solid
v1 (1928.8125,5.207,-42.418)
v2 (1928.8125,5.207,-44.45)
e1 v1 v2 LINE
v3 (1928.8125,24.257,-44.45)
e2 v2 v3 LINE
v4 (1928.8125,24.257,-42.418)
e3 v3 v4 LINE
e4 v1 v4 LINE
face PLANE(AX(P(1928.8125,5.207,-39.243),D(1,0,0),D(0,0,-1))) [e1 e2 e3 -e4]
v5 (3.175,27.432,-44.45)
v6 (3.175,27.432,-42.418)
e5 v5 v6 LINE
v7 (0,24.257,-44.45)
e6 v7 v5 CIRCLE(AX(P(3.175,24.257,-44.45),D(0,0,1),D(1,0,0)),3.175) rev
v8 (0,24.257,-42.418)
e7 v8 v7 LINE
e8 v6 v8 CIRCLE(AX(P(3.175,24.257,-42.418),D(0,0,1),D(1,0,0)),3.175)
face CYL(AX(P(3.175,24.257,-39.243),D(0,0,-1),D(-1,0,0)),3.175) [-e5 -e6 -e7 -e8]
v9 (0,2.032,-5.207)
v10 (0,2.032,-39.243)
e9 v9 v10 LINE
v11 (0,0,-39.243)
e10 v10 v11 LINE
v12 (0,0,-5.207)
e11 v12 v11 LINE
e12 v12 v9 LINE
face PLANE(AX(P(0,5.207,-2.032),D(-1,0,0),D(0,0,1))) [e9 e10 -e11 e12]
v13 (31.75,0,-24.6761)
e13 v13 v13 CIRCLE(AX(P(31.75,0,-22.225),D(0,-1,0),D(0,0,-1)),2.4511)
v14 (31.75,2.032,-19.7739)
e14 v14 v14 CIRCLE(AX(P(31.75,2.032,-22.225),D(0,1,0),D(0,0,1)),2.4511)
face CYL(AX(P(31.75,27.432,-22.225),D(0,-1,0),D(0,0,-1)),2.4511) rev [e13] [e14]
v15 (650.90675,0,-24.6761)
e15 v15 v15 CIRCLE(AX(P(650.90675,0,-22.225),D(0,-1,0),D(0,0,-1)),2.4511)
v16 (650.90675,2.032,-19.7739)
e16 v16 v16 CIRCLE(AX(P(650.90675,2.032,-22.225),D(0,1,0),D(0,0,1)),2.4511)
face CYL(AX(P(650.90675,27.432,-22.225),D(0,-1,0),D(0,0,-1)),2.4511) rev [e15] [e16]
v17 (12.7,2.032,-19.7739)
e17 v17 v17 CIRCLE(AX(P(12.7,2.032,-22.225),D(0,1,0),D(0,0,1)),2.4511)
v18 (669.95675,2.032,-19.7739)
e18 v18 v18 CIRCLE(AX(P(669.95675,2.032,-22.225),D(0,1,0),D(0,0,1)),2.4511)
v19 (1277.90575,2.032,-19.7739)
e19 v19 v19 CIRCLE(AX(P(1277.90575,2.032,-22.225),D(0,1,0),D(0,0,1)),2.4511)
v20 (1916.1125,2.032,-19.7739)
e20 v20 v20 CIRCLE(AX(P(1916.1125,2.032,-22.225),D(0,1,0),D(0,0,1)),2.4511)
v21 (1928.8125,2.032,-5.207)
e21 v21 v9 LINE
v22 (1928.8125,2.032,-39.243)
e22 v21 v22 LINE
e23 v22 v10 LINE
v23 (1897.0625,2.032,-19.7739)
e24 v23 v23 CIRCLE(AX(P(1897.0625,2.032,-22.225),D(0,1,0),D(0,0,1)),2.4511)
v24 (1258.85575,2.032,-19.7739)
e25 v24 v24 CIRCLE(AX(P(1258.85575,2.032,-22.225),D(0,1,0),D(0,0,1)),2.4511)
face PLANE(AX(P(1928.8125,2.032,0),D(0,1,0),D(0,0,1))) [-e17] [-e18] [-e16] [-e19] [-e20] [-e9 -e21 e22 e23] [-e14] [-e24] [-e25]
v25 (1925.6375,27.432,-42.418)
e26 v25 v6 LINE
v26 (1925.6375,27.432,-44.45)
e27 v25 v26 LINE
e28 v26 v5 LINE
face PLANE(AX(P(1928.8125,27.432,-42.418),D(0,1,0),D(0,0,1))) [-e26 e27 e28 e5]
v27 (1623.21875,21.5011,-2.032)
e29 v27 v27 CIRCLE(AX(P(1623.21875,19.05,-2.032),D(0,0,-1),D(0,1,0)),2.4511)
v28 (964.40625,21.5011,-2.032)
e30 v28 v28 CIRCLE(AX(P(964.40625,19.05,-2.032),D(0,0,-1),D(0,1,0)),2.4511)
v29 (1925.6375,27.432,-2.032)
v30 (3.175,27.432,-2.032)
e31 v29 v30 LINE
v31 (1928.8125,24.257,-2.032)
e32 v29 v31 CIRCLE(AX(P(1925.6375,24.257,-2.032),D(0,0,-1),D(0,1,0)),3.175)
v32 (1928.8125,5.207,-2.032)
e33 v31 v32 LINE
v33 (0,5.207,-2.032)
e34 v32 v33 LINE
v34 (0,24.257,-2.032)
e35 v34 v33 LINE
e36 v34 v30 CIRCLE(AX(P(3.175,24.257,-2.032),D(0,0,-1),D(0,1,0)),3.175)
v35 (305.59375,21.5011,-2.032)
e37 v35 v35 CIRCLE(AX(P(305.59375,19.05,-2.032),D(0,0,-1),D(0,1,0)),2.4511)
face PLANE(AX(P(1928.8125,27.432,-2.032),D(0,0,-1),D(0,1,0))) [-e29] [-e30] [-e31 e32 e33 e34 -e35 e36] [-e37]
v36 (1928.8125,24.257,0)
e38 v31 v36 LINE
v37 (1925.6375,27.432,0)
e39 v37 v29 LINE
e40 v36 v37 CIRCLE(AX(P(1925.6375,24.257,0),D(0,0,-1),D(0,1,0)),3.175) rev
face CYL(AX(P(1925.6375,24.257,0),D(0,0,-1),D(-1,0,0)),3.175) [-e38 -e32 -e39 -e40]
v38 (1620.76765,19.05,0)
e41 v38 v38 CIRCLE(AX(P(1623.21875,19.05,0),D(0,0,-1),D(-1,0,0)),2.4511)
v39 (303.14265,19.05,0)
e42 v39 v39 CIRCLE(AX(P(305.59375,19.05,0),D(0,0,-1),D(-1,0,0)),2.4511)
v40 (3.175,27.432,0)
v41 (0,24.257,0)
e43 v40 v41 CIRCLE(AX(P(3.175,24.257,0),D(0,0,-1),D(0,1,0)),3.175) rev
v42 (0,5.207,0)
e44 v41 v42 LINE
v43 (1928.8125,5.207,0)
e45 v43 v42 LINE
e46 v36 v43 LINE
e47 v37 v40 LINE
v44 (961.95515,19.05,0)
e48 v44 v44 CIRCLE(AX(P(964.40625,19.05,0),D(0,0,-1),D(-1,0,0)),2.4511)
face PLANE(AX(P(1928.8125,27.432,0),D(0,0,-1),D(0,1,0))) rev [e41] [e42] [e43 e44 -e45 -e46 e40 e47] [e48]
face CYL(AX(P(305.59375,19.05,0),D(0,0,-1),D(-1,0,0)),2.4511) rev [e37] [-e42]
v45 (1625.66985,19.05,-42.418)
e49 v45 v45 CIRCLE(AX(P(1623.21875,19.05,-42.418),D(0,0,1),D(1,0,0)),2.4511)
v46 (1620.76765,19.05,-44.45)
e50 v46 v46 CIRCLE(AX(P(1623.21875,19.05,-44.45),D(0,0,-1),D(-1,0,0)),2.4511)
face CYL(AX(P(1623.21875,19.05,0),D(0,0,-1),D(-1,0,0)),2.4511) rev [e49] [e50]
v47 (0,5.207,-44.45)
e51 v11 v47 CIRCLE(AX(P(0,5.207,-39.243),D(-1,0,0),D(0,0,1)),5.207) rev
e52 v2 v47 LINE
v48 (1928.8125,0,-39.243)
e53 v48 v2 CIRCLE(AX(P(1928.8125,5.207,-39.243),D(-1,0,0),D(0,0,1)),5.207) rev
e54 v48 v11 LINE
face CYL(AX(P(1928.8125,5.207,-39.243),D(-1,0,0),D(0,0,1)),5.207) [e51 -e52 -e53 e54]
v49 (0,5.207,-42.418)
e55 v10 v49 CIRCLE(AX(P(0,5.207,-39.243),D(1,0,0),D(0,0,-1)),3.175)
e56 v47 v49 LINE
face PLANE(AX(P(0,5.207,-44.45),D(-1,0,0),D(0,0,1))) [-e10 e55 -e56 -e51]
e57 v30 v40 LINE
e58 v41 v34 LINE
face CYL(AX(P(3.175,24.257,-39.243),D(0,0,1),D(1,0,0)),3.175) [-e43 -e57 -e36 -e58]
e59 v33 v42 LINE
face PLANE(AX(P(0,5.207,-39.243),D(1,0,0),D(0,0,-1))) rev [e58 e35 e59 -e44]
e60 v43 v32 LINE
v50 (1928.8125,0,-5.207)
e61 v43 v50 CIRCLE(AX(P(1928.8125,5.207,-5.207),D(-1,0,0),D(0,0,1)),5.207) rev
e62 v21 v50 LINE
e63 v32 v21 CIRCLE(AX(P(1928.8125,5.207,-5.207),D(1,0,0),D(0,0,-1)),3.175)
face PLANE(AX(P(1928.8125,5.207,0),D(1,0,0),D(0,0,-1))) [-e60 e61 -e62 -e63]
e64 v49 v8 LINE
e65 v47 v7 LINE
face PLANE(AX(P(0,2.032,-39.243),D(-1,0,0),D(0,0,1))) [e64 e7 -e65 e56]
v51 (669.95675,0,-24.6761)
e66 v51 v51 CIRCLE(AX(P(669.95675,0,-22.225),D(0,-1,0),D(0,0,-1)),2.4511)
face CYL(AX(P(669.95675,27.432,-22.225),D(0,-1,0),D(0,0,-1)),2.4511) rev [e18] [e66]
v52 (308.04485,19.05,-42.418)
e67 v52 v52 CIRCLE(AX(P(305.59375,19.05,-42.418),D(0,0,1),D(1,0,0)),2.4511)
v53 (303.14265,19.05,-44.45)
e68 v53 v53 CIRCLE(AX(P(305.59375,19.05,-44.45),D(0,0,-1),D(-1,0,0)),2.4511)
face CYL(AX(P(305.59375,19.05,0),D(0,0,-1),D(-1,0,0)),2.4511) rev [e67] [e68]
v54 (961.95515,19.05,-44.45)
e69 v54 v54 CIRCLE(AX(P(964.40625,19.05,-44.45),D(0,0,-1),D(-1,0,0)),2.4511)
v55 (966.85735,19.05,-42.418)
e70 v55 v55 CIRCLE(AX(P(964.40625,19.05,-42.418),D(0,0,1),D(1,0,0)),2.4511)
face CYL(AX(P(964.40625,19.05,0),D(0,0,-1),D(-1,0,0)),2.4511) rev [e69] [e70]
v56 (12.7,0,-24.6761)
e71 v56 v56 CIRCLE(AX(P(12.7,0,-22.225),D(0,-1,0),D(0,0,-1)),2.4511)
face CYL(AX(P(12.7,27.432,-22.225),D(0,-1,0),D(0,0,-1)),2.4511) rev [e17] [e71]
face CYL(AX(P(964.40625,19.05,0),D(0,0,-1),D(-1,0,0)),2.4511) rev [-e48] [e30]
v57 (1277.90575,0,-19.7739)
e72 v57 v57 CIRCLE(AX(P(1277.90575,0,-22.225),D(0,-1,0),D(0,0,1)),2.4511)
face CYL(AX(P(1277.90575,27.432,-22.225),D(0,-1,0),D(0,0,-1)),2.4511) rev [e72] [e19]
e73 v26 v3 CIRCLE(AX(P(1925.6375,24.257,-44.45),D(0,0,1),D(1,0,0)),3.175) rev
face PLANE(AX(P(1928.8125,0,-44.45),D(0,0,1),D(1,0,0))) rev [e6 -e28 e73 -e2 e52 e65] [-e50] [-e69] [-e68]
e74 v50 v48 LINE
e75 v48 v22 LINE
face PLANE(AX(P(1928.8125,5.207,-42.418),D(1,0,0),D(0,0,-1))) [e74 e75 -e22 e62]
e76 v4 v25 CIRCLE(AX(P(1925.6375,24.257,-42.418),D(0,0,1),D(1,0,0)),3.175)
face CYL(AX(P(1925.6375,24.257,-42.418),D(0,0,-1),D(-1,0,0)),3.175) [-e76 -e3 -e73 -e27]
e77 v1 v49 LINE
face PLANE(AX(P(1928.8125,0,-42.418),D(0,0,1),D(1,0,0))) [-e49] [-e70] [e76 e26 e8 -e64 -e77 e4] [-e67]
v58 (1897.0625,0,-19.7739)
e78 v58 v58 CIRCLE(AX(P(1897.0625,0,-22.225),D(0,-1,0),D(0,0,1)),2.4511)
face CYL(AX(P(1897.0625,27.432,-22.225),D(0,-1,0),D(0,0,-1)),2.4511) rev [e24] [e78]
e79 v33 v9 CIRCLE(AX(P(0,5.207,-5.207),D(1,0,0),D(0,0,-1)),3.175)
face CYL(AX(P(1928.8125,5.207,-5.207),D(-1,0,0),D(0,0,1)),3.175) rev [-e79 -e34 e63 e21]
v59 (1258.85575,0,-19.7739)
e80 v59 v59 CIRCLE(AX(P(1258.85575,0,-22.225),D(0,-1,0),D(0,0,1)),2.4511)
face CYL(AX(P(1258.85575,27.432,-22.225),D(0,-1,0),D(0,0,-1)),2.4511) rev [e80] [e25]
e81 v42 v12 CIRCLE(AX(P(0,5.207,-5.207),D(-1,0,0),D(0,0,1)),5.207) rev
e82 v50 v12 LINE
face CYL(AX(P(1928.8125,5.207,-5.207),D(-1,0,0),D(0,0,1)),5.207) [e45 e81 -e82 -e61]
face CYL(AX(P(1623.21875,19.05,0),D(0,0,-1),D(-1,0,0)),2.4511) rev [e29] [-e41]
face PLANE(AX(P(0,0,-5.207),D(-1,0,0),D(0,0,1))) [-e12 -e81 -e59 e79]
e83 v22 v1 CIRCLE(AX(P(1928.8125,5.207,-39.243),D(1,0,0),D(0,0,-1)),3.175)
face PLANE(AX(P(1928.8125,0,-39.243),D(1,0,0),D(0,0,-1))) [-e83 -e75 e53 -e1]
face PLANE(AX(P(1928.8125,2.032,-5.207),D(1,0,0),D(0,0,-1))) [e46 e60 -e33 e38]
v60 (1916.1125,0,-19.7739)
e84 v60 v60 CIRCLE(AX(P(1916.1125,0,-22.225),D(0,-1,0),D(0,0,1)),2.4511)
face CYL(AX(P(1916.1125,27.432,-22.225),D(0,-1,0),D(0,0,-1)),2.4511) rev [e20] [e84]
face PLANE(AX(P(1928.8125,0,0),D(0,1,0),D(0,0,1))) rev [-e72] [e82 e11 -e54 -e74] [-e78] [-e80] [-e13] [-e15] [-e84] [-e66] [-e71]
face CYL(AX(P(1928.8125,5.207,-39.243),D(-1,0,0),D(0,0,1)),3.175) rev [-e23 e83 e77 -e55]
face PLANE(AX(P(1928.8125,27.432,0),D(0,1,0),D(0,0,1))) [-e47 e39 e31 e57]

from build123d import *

# Parameters (mm, degrees)
BASE_FLANGE1_DEPTH = 1928.8125
SKETCH2_R          = 2.4511
CUT_EXTRUDE1_DEPTH = 1930.51962345
SKETCH3_R          = 2.4511
CUT_EXTRUDE2_DEPTH = 1930.51962345
FILLET1_R          = 3.175


# Sheet-metal steps are written as plain solids
with BuildPart() as part:
    # Sketch1 → Base-Flange1 (new body)
    with BuildSketch(Plane(origin=(0, 0, 0), x_dir=(0, 0, -1), z_dir=(1, 0, 0))):
        with BuildLine():
            Line((0, 27.432), (0, 5.207))
            ThreePointArc((0, 5.207), (1.52509499, 1.52509499), (5.207, 0))
            Line((5.207, 0), (39.243, 0))
            ThreePointArc((39.243, 0), (42.92490501, 1.52509499), (44.45, 5.207))
            Line((44.45, 5.207), (44.45, 27.432))
            Line((44.45, 27.432), (42.418, 27.432))
            Line((42.418, 27.432), (42.418, 5.207))
            ThreePointArc((42.418, 5.207), (41.48806403, 2.96193597), (39.243, 2.032))
            Line((39.243, 2.032), (5.207, 2.032))
            ThreePointArc((5.207, 2.032), (2.96193597, 2.96193597), (2.032, 5.207))
            Line((2.032, 5.207), (2.032, 27.432))
            Line((2.032, 27.432), (0, 27.432))
        make_face()
    extrude(amount=BASE_FLANGE1_DEPTH)

    # Sketch2 → Cut-Extrude1 (cut, through all)
    with BuildSketch(Plane(origin=(0, 0, 0), x_dir=(-1, 0, 0), z_dir=(0, -1, 0))):
        with Locations(Location((-12.7, 22.225, 0), (0, 0, 90))):
            Circle(SKETCH2_R)
        with Locations(Location((-31.75, 22.225, 0), (0, 0, 90))):
            Circle(SKETCH2_R)
        with Locations(Location((-650.90675, 22.225, 0), (0, 0, 90))):
            Circle(SKETCH2_R)
        with Locations(Location((-669.95675, 22.225, 0), (0, 0, 90))):
            Circle(SKETCH2_R)
        with Locations(Location((-1916.1125, 22.225, 0), (0, 0, 270))):
            Circle(SKETCH2_R)
        with Locations(Location((-1897.0625, 22.225, 0), (0, 0, 270))):
            Circle(SKETCH2_R)
        with Locations(Location((-1277.90575, 22.225, 0), (0, 0, 270))):
            Circle(SKETCH2_R)
        with Locations(Location((-1258.85575, 22.225, 0), (0, 0, 270))):
            Circle(SKETCH2_R)
    extrude(amount=-CUT_EXTRUDE1_DEPTH, mode=Mode.SUBTRACT)

    # Sketch3 → Cut-Extrude2 (cut, through all)
    with BuildSketch(Plane(origin=(0, 0, -44.45), x_dir=(-1, 0, 0), z_dir=(0, 0, -1))):
        with Locations((-1623.21875, 19.05)):
            Circle(SKETCH3_R)
        with Locations((-964.40625, 19.05)):
            Circle(SKETCH3_R)
        with Locations((-305.59375, 19.05)):
            Circle(SKETCH3_R)
    extrude(amount=-CUT_EXTRUDE2_DEPTH, mode=Mode.SUBTRACT)

    # Fillet1
    fillet1_edges = [part.edges().sort_by_distance(p)[0] for p in [
        (0, 27.432, -1.016),
        (0, 27.432, -43.434),
        (1928.8125, 27.432, -1.016),
        (1928.8125, 27.432, -43.434),
    ]]
    fillet(fillet1_edges, radius=FILLET1_R)


solid = part.part
